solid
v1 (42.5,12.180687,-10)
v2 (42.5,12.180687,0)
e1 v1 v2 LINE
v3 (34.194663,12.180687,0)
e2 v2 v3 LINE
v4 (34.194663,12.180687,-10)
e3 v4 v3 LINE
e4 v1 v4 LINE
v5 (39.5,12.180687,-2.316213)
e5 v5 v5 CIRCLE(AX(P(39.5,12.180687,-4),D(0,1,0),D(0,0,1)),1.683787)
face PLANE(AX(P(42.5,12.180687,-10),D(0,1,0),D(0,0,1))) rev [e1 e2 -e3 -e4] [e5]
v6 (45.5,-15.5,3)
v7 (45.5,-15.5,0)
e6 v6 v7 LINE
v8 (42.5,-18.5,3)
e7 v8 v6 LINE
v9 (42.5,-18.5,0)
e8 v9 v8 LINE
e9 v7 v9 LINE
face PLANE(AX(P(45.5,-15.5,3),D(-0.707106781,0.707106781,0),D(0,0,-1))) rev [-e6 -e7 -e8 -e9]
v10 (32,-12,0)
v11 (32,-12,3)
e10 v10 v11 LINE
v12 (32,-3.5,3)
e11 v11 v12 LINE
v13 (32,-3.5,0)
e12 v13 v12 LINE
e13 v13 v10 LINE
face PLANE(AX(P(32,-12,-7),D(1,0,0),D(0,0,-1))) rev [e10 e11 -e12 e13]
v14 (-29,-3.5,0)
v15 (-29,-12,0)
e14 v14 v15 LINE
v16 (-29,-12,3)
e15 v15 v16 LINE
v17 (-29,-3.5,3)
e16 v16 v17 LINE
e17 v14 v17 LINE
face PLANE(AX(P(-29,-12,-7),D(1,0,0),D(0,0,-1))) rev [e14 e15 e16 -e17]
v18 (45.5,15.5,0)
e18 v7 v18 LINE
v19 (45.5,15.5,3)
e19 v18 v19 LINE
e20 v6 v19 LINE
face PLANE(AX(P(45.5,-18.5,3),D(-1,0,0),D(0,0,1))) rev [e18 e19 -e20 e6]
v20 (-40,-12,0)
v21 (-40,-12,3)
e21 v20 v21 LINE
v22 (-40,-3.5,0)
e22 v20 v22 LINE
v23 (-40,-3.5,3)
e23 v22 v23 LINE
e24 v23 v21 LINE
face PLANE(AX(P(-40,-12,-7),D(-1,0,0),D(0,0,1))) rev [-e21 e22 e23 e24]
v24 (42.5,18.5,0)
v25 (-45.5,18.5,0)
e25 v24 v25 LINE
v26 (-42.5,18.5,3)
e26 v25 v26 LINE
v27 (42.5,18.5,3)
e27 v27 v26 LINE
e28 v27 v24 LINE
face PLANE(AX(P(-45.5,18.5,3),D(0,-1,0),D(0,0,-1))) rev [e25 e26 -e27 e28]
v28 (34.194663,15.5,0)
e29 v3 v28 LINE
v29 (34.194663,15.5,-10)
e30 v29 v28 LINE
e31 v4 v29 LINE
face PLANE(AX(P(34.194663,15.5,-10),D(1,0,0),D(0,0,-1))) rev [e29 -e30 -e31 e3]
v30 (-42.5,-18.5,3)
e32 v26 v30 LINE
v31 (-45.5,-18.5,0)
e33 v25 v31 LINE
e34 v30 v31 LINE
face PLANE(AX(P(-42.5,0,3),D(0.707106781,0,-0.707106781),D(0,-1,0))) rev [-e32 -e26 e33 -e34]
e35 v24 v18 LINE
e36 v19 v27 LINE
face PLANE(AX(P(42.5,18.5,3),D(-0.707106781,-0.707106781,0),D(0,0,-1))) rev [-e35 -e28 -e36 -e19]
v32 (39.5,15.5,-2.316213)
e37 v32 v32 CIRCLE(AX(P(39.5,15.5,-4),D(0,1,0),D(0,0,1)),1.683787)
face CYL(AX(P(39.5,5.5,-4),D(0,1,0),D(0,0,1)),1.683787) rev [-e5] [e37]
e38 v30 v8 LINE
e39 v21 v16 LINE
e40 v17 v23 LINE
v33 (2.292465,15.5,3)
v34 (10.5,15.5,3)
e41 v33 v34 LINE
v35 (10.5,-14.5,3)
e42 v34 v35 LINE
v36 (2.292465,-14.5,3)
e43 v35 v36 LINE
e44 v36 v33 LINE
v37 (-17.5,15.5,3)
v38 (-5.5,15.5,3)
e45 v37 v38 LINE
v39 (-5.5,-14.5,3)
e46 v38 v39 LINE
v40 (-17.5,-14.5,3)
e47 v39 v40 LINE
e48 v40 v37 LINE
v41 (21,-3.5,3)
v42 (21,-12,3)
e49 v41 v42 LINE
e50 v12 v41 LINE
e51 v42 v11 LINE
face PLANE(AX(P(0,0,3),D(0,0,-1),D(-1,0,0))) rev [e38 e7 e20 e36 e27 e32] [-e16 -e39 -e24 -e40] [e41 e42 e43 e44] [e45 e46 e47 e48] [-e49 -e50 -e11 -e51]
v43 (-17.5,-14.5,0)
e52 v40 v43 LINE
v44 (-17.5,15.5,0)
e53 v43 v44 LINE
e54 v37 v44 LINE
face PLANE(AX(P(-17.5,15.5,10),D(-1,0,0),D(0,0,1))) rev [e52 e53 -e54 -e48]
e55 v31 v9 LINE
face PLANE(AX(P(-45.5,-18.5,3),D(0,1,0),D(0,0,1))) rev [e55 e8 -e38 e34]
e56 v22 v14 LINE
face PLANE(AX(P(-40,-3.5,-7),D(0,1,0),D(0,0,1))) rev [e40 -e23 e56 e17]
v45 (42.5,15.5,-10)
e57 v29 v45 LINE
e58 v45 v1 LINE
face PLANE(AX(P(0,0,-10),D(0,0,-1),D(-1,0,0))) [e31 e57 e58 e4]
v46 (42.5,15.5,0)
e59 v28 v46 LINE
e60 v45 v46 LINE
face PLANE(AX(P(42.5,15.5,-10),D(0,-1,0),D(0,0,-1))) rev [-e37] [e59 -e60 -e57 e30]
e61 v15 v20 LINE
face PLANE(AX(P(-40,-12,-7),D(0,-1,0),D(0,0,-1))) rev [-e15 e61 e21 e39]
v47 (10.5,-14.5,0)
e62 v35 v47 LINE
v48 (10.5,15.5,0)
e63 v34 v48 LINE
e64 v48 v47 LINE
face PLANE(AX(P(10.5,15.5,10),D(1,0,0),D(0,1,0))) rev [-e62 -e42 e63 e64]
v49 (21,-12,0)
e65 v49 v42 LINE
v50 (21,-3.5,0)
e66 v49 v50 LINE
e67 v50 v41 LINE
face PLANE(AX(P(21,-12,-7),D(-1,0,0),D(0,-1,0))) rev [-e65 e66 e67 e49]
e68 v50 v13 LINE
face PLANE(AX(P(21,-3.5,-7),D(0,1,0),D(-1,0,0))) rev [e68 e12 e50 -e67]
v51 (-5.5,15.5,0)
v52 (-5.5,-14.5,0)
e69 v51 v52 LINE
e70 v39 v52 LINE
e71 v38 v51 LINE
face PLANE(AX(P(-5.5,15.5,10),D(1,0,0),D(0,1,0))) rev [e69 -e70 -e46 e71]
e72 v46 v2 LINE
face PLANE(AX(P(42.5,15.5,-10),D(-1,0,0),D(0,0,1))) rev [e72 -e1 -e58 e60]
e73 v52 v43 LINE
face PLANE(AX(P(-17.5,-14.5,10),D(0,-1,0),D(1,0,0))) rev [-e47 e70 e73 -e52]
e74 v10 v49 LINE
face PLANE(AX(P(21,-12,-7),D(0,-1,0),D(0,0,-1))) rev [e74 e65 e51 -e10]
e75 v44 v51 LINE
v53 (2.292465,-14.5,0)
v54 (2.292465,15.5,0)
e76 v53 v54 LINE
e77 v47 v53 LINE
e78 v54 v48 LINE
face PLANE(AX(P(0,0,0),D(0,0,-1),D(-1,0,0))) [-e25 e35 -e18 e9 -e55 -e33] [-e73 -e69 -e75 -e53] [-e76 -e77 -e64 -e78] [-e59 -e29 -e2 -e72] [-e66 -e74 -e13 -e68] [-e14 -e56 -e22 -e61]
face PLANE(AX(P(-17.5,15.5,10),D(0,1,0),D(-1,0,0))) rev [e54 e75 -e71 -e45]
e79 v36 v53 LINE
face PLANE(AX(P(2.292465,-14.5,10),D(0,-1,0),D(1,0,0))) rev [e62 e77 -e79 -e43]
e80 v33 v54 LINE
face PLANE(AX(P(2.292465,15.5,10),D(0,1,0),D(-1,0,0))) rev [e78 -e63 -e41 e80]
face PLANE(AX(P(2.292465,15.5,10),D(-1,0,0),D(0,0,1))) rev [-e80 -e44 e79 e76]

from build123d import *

# Parameters (mm, degrees)
SKETCH_1_W          = 91
SKETCH_1_H          = 37
EXTRUDE_1_DEPTH     = 3
CHAMFER_1_SIZE      = 3
SKETCH_2_W          = 11
SKETCH_2_H          = 8.5
CUT_EXTRUDE_1_DEPTH = 10
SKETCH_3_W          = 12
SKETCH_3_H          = 30
SKETCH_3_W_2        = 8.207535441
CUT_EXTRUDE_2_DEPTH = 10
SKETCH_4_W          = 8.305337468
SKETCH_4_H          = 3.319312894
EXTRUDE_2_DEPTH     = 10
SKETCH_5_R          = 1.683787266
CUT_EXTRUDE_3_DEPTH = 10
CHAMFER_2_SIZE      = 3
CHAMFER_3_SIZE      = 3


with BuildPart() as part:
    # 草图1 → 凸台-拉伸1 (new body)
    with BuildSketch(Plane.XY):
        Rectangle(SKETCH_1_W, SKETCH_1_H)
    extrude(amount=EXTRUDE_1_DEPTH)

    # 倒角1
    chamfer_1_edges = [part.edges().sort_by_distance(p)[0] for p in [
        (-45.5, 0, 3),
    ]]
    chamfer(chamfer_1_edges, length=CHAMFER_1_SIZE - 0.0001)  # a hair under: the kernel refuses the full size

    # 草图2 → 切除-拉伸1 (cut)
    with BuildSketch(Plane.XY.offset(3)):
        with Locations((-34.5, -7.75)):
            Rectangle(SKETCH_2_W, SKETCH_2_H)
        with Locations((26.5, -7.75)):
            Rectangle(SKETCH_2_W, SKETCH_2_H)
    extrude(amount=-CUT_EXTRUDE_1_DEPTH, mode=Mode.SUBTRACT)

    # 草图3 → 切除-拉伸2 (cut)
    with BuildSketch(Plane(origin=(0, 0, 0), x_dir=(-1, 0, 0), z_dir=(0, 0, -1))):
        with Locations((11.5, 0.5)):
            Rectangle(SKETCH_3_W, SKETCH_3_H)
        with Locations((-6.39623228, 0.5)):
            Rectangle(SKETCH_3_W_2, SKETCH_3_H)
    extrude(amount=-CUT_EXTRUDE_2_DEPTH, mode=Mode.SUBTRACT)

    # 草图4 → 凸台-拉伸2 (add)
    with BuildSketch(Plane(origin=(0, 0, 0), x_dir=(-1, 0, 0), z_dir=(0, 0, -1))):
        with Locations((-38.347331266, 13.840343553)):
            Rectangle(SKETCH_4_W, SKETCH_4_H)
    extrude(amount=EXTRUDE_2_DEPTH)

    # 草图5 → 切除-拉伸3 (cut)
    with BuildSketch(Plane(origin=(0, 15.5, 0), x_dir=(1, 0, 0), z_dir=(0, 1, 0))):
        with Locations(Location((39.5, 4, 0), (0, 0, 270))):
            Circle(SKETCH_5_R)
    extrude(amount=-CUT_EXTRUDE_3_DEPTH, mode=Mode.SUBTRACT)

    # 倒角2
    chamfer_2_edges = [part.edges().sort_by_distance(p)[0] for p in [
        (45.5, 18.5, 1.5),
    ]]
    chamfer(chamfer_2_edges, length=CHAMFER_2_SIZE)

    # 倒角3
    chamfer_3_edges = [part.edges().sort_by_distance(p)[0] for p in [
        (45.5, -18.5, 1.5),
    ]]
    chamfer(chamfer_3_edges, length=CHAMFER_3_SIZE)


solid = part.part
